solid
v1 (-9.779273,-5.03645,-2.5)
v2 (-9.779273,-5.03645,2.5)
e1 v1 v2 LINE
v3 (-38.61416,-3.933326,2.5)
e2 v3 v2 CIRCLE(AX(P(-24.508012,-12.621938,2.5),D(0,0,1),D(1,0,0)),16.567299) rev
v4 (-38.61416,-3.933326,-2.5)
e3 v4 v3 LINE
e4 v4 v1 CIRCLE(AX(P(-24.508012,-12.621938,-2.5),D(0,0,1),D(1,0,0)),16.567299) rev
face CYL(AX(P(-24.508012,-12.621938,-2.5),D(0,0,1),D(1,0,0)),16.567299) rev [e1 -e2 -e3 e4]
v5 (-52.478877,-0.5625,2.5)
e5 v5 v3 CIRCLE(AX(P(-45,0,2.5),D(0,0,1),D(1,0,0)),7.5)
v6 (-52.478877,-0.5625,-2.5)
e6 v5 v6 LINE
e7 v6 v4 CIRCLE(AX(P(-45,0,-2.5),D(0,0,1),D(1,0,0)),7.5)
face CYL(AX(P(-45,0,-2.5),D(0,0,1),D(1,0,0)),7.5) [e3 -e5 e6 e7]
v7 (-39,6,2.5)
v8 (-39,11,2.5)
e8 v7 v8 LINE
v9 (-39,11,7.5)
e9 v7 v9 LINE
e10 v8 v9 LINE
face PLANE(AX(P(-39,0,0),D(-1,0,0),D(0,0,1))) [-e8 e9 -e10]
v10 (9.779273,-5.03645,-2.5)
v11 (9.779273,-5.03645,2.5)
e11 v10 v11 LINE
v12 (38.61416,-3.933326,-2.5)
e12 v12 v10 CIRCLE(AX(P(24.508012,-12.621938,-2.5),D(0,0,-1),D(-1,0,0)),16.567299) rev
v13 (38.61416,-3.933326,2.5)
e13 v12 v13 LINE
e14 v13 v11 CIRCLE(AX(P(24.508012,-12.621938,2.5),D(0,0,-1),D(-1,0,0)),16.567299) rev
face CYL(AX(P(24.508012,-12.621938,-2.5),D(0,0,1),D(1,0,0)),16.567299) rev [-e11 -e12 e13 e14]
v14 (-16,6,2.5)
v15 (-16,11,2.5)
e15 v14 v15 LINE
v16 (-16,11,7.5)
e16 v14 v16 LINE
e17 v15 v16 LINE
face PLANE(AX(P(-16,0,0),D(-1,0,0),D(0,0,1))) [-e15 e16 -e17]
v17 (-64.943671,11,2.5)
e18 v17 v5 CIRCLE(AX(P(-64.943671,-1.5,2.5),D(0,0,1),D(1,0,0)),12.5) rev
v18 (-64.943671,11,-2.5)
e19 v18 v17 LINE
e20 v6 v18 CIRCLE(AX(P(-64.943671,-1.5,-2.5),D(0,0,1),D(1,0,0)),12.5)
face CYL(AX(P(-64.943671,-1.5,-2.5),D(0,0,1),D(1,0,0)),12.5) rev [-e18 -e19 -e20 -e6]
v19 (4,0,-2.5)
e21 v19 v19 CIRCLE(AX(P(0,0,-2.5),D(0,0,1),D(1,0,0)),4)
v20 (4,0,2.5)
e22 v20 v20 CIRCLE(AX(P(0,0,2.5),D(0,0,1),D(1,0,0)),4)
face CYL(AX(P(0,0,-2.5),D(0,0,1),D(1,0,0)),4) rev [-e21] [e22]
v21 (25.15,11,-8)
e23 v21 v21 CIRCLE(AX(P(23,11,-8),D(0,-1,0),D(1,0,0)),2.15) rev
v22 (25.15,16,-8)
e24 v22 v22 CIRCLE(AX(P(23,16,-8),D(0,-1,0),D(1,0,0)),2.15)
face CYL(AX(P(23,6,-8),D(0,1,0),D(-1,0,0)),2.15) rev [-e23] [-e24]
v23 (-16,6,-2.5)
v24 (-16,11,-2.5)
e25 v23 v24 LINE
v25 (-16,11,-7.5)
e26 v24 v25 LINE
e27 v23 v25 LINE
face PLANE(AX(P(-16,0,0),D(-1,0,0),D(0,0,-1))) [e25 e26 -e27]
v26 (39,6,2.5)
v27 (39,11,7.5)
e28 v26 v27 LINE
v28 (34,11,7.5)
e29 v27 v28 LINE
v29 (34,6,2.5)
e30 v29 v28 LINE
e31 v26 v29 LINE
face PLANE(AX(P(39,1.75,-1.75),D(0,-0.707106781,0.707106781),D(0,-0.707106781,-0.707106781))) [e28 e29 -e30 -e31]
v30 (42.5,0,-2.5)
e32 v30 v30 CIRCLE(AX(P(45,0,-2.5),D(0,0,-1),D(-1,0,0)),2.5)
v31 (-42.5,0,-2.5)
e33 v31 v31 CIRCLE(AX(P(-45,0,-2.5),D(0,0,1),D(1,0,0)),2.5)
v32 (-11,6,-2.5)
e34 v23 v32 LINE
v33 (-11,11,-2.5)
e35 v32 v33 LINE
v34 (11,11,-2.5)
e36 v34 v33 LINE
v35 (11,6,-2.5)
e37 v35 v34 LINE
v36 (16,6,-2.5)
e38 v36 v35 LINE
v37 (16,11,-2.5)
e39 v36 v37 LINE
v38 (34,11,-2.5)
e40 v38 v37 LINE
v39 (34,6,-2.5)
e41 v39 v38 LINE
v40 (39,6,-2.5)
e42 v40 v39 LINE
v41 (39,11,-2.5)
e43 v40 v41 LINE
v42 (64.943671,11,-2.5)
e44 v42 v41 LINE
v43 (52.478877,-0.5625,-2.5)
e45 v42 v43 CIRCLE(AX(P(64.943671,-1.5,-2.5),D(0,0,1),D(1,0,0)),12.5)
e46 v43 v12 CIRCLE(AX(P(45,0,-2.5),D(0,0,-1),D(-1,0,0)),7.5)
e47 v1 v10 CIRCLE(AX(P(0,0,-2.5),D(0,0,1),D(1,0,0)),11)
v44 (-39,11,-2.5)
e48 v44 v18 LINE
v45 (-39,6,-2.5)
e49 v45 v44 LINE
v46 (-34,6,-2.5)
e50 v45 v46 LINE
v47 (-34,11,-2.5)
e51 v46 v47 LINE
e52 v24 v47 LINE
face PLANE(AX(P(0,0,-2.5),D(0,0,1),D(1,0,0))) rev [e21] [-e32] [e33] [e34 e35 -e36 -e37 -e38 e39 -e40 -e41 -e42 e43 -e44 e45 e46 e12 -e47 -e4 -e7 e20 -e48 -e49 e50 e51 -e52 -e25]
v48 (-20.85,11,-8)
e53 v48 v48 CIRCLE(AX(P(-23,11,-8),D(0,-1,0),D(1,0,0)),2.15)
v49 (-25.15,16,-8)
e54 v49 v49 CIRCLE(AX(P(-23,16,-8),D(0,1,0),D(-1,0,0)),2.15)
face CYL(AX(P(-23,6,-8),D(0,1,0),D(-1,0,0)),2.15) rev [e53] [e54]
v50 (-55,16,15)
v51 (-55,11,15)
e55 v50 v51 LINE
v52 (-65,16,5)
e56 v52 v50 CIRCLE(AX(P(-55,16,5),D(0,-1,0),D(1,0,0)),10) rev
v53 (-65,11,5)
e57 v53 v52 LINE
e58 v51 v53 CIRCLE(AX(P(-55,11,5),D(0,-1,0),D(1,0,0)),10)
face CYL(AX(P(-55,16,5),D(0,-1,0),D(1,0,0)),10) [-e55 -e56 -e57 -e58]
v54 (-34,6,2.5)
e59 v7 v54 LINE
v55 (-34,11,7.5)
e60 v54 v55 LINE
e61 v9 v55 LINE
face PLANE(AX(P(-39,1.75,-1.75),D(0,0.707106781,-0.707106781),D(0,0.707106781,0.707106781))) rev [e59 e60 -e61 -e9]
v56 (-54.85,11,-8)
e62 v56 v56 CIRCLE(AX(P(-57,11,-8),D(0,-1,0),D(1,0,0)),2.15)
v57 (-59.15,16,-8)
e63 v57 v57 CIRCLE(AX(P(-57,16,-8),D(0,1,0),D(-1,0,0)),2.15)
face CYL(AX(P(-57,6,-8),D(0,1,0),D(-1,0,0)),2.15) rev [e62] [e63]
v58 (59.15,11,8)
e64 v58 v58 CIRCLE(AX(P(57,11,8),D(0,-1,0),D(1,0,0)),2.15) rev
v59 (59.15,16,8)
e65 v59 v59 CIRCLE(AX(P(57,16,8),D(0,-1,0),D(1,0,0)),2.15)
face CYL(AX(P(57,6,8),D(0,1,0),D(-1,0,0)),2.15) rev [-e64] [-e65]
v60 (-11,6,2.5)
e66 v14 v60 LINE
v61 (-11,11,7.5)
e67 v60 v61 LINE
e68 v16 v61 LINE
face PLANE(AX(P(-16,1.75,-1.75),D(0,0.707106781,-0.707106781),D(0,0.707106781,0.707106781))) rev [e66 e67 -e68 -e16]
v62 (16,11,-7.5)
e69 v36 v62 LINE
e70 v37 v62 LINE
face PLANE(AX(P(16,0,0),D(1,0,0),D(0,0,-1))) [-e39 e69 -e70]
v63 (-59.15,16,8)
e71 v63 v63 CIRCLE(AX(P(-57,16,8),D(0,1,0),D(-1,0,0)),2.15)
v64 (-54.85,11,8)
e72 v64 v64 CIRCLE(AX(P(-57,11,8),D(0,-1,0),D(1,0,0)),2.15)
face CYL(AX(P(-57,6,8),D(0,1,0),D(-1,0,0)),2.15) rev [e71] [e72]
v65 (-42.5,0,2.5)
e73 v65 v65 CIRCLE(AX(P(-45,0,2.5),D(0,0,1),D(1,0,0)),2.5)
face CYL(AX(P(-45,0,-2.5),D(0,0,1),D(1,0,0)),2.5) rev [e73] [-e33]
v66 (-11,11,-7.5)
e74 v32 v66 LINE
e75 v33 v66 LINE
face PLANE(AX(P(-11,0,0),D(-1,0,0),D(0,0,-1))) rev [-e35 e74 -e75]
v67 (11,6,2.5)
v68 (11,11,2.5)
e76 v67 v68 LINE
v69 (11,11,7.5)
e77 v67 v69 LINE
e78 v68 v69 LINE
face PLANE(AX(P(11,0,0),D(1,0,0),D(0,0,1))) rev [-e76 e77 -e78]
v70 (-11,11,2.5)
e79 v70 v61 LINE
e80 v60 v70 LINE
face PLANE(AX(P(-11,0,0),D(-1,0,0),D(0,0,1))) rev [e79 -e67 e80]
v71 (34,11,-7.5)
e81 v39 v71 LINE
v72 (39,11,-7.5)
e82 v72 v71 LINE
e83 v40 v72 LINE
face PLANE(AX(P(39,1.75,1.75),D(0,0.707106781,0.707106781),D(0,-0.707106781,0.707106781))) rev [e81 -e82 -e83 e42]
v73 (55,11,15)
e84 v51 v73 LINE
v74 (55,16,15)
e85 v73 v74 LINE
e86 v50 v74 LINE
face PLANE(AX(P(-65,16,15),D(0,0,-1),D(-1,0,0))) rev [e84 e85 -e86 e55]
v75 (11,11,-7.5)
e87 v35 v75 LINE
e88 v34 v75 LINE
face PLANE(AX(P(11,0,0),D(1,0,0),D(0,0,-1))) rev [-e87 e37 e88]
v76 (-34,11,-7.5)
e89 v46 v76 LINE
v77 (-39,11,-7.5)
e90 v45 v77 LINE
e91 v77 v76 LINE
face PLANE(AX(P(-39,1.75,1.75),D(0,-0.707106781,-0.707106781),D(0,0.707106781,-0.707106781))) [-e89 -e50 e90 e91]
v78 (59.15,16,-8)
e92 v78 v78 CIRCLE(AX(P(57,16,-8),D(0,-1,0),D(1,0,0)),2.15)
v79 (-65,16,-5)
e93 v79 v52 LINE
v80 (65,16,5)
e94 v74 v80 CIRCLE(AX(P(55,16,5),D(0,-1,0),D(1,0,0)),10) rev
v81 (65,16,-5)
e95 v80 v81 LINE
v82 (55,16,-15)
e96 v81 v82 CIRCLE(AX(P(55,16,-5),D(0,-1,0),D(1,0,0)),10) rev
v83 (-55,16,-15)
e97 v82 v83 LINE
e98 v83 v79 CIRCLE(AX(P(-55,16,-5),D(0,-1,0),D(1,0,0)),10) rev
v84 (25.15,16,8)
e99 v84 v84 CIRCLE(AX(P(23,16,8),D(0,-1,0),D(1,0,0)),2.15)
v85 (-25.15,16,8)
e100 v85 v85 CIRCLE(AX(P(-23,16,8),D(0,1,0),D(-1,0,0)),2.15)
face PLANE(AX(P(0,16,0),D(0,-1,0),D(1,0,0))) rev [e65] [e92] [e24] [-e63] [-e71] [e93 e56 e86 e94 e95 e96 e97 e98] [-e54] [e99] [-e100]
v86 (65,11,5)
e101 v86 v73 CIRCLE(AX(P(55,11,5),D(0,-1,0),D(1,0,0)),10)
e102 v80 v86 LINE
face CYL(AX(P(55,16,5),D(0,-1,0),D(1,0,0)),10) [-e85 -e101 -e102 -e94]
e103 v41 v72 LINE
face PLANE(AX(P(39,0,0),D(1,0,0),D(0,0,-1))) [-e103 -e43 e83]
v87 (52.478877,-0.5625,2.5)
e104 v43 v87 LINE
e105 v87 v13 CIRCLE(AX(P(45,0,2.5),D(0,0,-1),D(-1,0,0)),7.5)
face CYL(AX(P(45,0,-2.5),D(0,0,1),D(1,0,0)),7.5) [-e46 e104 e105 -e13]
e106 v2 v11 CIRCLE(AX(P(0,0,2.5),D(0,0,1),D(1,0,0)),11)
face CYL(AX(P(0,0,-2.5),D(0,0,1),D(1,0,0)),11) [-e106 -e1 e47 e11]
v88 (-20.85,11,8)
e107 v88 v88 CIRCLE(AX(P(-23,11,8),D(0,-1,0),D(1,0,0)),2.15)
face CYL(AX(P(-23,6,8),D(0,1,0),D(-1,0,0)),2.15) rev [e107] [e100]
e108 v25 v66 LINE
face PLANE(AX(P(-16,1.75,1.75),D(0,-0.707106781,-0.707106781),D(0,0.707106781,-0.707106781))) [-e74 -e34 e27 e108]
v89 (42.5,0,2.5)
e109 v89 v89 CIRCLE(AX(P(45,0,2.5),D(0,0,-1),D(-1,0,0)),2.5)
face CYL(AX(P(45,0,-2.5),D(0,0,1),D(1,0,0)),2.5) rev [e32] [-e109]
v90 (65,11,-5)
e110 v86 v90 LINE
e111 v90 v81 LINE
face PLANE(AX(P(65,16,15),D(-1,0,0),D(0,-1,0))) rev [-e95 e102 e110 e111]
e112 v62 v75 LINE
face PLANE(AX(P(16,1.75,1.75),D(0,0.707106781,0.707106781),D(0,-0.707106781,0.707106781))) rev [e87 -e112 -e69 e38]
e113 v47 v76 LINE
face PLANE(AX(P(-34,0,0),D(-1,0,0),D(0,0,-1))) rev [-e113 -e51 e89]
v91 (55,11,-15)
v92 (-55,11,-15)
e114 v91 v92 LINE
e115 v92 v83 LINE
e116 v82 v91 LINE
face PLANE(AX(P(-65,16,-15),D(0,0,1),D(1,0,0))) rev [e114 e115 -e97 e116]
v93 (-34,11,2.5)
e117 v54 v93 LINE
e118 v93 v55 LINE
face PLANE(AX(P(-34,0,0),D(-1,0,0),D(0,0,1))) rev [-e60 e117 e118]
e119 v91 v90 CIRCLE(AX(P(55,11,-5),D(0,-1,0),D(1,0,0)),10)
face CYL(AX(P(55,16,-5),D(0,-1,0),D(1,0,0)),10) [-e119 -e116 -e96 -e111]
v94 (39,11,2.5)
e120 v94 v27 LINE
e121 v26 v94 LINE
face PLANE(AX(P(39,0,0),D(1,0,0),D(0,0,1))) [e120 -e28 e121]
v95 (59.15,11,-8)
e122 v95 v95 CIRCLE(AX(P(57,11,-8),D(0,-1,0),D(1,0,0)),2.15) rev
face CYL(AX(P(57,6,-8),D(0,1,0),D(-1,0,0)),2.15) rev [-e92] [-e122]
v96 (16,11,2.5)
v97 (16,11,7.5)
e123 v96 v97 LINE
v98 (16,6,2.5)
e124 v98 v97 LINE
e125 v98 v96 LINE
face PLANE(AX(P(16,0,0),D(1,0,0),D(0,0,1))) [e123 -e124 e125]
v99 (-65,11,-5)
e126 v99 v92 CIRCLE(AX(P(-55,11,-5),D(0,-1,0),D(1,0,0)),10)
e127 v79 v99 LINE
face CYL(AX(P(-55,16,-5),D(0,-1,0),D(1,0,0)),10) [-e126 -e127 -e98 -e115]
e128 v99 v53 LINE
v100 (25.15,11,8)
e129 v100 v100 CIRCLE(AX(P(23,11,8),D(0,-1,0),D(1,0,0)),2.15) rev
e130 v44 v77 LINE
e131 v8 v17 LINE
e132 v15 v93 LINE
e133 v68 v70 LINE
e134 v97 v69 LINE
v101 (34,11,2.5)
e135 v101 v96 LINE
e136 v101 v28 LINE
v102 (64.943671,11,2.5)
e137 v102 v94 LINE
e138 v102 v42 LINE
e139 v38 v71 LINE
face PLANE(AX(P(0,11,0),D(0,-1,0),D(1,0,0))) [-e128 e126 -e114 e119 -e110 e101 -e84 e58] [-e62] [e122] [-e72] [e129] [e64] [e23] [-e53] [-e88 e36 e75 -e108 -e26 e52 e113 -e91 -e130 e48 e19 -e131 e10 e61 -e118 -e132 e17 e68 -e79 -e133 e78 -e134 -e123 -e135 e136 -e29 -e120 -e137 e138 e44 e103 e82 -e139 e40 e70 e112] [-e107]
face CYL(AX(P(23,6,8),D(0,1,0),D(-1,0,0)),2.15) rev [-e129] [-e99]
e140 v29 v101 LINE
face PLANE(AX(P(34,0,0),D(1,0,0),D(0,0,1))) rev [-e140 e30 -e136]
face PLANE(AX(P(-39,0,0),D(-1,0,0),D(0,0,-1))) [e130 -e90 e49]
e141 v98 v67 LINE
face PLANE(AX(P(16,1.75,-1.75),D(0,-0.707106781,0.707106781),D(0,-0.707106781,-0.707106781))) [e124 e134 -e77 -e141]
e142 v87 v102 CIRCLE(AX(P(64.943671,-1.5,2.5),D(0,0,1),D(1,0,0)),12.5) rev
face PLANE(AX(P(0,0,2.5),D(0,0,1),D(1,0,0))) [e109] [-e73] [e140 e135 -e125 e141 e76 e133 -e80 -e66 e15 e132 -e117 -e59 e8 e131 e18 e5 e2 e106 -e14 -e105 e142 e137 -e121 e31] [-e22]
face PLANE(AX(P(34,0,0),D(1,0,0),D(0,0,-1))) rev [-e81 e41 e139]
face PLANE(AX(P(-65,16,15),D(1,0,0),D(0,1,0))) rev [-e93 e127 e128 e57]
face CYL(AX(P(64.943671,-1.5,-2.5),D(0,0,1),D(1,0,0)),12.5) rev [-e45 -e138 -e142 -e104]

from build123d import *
from build123d.topology import SkipClean

# Parameters (mm, degrees)
SKETCH1_R                                = 2.5
BOSS_EXTRUDE1_DEPTH                      = 2.5
SKETCH4_W                                = 130
SKETCH4_H                                = 30
BOSS_EXTRUDE2_DEPTH                      = 5
FILLET1_R                                = 10
FILLET2_R                                = 12.5
SKETCH5_R                                = 2.15
CUT_EXTRUDE1_DEPTH                       = 10
BOSS_EXTRUDE3_DEPTH                      = 2.5
LPATTERN1_COUNT                          = 2
LPATTERN1_PITCH                          = 23
MIRROR4_COPY_1_DEPTH                     = 2.5
MIRROR4_AT_THE_SECOND_PLANE_COPY_1_DEPTH = 2.5
MIRROR4_AT_THE_SECOND_PLANE_COPY_2_DEPTH = 2.5
MIRROR4_AT_THE_SECOND_PLANE_COPY_3_DEPTH = 2.5


with BuildPart() as part:
    # Sketch1 → Boss-Extrude1 (new, symmetric)
    with BuildSketch(Plane.XY):
        with BuildLine():
            ThreePointArc((-38.614160498, -3.933326056), (-23.874667518, 3.933250754), (-9.779272654, -5.036449778))
            ThreePointArc((-9.779272654, -5.036449778), (-5.727087063, -9.391510729), (0, -11))
            Line((0, -11), (0, -4))
            ThreePointArc((0, -4), (-4, 0), (0, 4))
            Line((0, 4), (0, 11))
            Line((0, 11), (-52.5, 11))
            Line((-52.5, 11), (-52.5, 0))
            ThreePointArc((-52.5, 0), (-47.044040574, -7.216086067), (-38.614160498, -3.933326056))
        make_face()
        with Locations((-45, 0)):
            Circle(SKETCH1_R, mode=Mode.SUBTRACT)
    boss_extrude1 = extrude(amount=BOSS_EXTRUDE1_DEPTH, both=True)

    # Mirror1: Boss-Extrude1 across plane
    with SkipClean():  # the faces are left unmerged after this step: merging them gives an invalid solid
        add(boss_extrude1.mirror(Plane(origin=(0, 0, -2.5), x_dir=(0, 0, 1), z_dir=(-1, 0, 0))))

    # Sketch4 → Boss-Extrude2 (add)
    with SkipClean():  # the faces are left unmerged after this step: merging them gives an invalid solid
        with BuildSketch(Plane(origin=(0, 11, 0), x_dir=(1, 0, 0), z_dir=(0, 1, 0))):
            Rectangle(SKETCH4_W, SKETCH4_H)
        extrude(amount=BOSS_EXTRUDE2_DEPTH)

    # Fillet1
    fillet1_edges = [part.edges().sort_by_distance(p)[0] for p in [
        (-65, 13.5, -15),
        (-65, 13.5, 15),
        (65, 13.5, 15),
        (65, 13.5, -15),
    ]]
    fillet(fillet1_edges, radius=FILLET1_R)

    # Fillet2
    # the kernel refuses this fillet: 12.5 mm, written as the material it adds along each edge
    with BuildSketch(Plane(origin=(-52.5, 11, -2.5), x_dir=(-1, 0, 0), z_dir=(0, 0, 1))) as fillet2_piece_1:
        with BuildLine():
            CenterArc((12.443670675, 12.5), FILLET2_R, 184.301222305, 85.698777695)
            Line((-0.021123497, 11.5625), (-1.267602914, 11.46875))
            ThreePointArc((-1.267602914, 11.46875), (-1.25, 11), (-1.25, 0))
            Line((-1.25, 0), (0, -1.25))
            Line((0, -1.25), (12.443670675, -1.25))
            Line((12.443670675, -1.25), (12.443670675, 0))
        make_face()
    extrude(amount=5)
    with BuildSketch(Plane(origin=(52.5, 11, -2.5), x_dir=(1, 0, 0), z_dir=(0, 0, 1))) as fillet2_piece_2:
        with BuildLine():
            CenterArc((12.443670675, -12.5), FILLET2_R, 90, 85.698777695)
            Line((-0.021123497, -11.5625), (-1.267602914, -11.46875))
            ThreePointArc((-1.267602914, -11.46875), (-1.25, -11), (-1.25, 0))
            Line((-1.25, 0), (0, 1.25))
            Line((0, 1.25), (12.443670675, 1.25))
            Line((12.443670675, 1.25), (12.443670675, 0))
        make_face()
    extrude(amount=5)

    # Sketch5 → Cut-Extrude1 (cut)
    with BuildSketch(Plane(origin=(0, 16, 0), x_dir=(1, 0, 0), z_dir=(0, 1, 0))):
        with Locations(Location((-57, -8, 0), (0, 0, 180))):
            Circle(SKETCH5_R)
        with Locations(Location((-57, 8, 0), (0, 0, 180))):
            Circle(SKETCH5_R)
        with Locations(Location((-23, -8, 0), (0, 0, 180))):
            Circle(SKETCH5_R)
        with Locations(Location((-23, 8, 0), (0, 0, 180))):
            Circle(SKETCH5_R)
    cut_extrude1 = extrude(amount=-CUT_EXTRUDE1_DEPTH, mode=Mode.SUBTRACT)

    # Mirror2: Cut-Extrude1 across plane
    add(cut_extrude1.mirror(Plane(origin=(0, 0, 0), x_dir=(0, 0, 1), z_dir=(1, 0, 0))), mode=Mode.SUBTRACT)

    # Sketch7 → Boss-Extrude3 (add, symmetric)
    with BuildSketch(Plane(origin=(36.5, 0, 0), x_dir=(0, 0, -1), z_dir=(1, 0, 0))):
        Polygon((5, 11), (2.5, 11), (2.5, 6), (7.5, 11), align=None)
    boss_extrude3 = extrude(amount=BOSS_EXTRUDE3_DEPTH, both=True)

    # LPattern1: Boss-Extrude3 ×2
    with Locations(*[(-i * LPATTERN1_PITCH, 0, 0) for i in range(1, LPATTERN1_COUNT)]):
        add(boss_extrude3)

    # Mirror4: Boss-Extrude3 across plane
    add(boss_extrude3.mirror(Plane.XY))

    # Mirror4 copy 1 sketch → Mirror4 copy 1 (add, symmetric)
    with BuildSketch(Plane(origin=(13.5, 0, 0), x_dir=(0, 0, 1), z_dir=(1, 0, 0))):
        Polygon((5, -11), (2.5, -11), (2.5, -6), (7.5, -11), align=None)
    extrude(amount=MIRROR4_COPY_1_DEPTH, both=True)

    # Mirror4 at the second plane: Boss-Extrude3 across plane
    add(boss_extrude3.mirror(Plane(origin=(0, 0, 0), x_dir=(0, 0, 1), z_dir=(1, 0, 0))))

    # Mirror4 at the second plane copy 1 sketc → Mirror4 at the second plane copy 1 (add, symmetric)
    with BuildSketch(Plane(origin=(-13.5, 0, 0), x_dir=(0, 0, -1), z_dir=(-1, 0, 0))):
        Polygon((5, -11), (2.5, -11), (2.5, -6), (7.5, -11), align=None)
    extrude(amount=MIRROR4_AT_THE_SECOND_PLANE_COPY_1_DEPTH, both=True)

    # Mirror4 at the second plane copy 2 sketc → Mirror4 at the second plane copy 2 (add, symmetric)
    with BuildSketch(Plane.ZY.offset(36.5)):
        Polygon((5, 11), (2.5, 11), (2.5, 6), (7.5, 11), align=None)
    extrude(amount=MIRROR4_AT_THE_SECOND_PLANE_COPY_2_DEPTH, both=True)

    # Mirror4 at the second plane copy 3 sketc → Mirror4 at the second plane copy 3 (add, symmetric)
    with BuildSketch(Plane.ZY.offset(13.5)):
        Polygon((5, 11), (2.5, 11), (2.5, 6), (7.5, 11), align=None)
    extrude(amount=MIRROR4_AT_THE_SECOND_PLANE_COPY_3_DEPTH, both=True)


solid = part.part
